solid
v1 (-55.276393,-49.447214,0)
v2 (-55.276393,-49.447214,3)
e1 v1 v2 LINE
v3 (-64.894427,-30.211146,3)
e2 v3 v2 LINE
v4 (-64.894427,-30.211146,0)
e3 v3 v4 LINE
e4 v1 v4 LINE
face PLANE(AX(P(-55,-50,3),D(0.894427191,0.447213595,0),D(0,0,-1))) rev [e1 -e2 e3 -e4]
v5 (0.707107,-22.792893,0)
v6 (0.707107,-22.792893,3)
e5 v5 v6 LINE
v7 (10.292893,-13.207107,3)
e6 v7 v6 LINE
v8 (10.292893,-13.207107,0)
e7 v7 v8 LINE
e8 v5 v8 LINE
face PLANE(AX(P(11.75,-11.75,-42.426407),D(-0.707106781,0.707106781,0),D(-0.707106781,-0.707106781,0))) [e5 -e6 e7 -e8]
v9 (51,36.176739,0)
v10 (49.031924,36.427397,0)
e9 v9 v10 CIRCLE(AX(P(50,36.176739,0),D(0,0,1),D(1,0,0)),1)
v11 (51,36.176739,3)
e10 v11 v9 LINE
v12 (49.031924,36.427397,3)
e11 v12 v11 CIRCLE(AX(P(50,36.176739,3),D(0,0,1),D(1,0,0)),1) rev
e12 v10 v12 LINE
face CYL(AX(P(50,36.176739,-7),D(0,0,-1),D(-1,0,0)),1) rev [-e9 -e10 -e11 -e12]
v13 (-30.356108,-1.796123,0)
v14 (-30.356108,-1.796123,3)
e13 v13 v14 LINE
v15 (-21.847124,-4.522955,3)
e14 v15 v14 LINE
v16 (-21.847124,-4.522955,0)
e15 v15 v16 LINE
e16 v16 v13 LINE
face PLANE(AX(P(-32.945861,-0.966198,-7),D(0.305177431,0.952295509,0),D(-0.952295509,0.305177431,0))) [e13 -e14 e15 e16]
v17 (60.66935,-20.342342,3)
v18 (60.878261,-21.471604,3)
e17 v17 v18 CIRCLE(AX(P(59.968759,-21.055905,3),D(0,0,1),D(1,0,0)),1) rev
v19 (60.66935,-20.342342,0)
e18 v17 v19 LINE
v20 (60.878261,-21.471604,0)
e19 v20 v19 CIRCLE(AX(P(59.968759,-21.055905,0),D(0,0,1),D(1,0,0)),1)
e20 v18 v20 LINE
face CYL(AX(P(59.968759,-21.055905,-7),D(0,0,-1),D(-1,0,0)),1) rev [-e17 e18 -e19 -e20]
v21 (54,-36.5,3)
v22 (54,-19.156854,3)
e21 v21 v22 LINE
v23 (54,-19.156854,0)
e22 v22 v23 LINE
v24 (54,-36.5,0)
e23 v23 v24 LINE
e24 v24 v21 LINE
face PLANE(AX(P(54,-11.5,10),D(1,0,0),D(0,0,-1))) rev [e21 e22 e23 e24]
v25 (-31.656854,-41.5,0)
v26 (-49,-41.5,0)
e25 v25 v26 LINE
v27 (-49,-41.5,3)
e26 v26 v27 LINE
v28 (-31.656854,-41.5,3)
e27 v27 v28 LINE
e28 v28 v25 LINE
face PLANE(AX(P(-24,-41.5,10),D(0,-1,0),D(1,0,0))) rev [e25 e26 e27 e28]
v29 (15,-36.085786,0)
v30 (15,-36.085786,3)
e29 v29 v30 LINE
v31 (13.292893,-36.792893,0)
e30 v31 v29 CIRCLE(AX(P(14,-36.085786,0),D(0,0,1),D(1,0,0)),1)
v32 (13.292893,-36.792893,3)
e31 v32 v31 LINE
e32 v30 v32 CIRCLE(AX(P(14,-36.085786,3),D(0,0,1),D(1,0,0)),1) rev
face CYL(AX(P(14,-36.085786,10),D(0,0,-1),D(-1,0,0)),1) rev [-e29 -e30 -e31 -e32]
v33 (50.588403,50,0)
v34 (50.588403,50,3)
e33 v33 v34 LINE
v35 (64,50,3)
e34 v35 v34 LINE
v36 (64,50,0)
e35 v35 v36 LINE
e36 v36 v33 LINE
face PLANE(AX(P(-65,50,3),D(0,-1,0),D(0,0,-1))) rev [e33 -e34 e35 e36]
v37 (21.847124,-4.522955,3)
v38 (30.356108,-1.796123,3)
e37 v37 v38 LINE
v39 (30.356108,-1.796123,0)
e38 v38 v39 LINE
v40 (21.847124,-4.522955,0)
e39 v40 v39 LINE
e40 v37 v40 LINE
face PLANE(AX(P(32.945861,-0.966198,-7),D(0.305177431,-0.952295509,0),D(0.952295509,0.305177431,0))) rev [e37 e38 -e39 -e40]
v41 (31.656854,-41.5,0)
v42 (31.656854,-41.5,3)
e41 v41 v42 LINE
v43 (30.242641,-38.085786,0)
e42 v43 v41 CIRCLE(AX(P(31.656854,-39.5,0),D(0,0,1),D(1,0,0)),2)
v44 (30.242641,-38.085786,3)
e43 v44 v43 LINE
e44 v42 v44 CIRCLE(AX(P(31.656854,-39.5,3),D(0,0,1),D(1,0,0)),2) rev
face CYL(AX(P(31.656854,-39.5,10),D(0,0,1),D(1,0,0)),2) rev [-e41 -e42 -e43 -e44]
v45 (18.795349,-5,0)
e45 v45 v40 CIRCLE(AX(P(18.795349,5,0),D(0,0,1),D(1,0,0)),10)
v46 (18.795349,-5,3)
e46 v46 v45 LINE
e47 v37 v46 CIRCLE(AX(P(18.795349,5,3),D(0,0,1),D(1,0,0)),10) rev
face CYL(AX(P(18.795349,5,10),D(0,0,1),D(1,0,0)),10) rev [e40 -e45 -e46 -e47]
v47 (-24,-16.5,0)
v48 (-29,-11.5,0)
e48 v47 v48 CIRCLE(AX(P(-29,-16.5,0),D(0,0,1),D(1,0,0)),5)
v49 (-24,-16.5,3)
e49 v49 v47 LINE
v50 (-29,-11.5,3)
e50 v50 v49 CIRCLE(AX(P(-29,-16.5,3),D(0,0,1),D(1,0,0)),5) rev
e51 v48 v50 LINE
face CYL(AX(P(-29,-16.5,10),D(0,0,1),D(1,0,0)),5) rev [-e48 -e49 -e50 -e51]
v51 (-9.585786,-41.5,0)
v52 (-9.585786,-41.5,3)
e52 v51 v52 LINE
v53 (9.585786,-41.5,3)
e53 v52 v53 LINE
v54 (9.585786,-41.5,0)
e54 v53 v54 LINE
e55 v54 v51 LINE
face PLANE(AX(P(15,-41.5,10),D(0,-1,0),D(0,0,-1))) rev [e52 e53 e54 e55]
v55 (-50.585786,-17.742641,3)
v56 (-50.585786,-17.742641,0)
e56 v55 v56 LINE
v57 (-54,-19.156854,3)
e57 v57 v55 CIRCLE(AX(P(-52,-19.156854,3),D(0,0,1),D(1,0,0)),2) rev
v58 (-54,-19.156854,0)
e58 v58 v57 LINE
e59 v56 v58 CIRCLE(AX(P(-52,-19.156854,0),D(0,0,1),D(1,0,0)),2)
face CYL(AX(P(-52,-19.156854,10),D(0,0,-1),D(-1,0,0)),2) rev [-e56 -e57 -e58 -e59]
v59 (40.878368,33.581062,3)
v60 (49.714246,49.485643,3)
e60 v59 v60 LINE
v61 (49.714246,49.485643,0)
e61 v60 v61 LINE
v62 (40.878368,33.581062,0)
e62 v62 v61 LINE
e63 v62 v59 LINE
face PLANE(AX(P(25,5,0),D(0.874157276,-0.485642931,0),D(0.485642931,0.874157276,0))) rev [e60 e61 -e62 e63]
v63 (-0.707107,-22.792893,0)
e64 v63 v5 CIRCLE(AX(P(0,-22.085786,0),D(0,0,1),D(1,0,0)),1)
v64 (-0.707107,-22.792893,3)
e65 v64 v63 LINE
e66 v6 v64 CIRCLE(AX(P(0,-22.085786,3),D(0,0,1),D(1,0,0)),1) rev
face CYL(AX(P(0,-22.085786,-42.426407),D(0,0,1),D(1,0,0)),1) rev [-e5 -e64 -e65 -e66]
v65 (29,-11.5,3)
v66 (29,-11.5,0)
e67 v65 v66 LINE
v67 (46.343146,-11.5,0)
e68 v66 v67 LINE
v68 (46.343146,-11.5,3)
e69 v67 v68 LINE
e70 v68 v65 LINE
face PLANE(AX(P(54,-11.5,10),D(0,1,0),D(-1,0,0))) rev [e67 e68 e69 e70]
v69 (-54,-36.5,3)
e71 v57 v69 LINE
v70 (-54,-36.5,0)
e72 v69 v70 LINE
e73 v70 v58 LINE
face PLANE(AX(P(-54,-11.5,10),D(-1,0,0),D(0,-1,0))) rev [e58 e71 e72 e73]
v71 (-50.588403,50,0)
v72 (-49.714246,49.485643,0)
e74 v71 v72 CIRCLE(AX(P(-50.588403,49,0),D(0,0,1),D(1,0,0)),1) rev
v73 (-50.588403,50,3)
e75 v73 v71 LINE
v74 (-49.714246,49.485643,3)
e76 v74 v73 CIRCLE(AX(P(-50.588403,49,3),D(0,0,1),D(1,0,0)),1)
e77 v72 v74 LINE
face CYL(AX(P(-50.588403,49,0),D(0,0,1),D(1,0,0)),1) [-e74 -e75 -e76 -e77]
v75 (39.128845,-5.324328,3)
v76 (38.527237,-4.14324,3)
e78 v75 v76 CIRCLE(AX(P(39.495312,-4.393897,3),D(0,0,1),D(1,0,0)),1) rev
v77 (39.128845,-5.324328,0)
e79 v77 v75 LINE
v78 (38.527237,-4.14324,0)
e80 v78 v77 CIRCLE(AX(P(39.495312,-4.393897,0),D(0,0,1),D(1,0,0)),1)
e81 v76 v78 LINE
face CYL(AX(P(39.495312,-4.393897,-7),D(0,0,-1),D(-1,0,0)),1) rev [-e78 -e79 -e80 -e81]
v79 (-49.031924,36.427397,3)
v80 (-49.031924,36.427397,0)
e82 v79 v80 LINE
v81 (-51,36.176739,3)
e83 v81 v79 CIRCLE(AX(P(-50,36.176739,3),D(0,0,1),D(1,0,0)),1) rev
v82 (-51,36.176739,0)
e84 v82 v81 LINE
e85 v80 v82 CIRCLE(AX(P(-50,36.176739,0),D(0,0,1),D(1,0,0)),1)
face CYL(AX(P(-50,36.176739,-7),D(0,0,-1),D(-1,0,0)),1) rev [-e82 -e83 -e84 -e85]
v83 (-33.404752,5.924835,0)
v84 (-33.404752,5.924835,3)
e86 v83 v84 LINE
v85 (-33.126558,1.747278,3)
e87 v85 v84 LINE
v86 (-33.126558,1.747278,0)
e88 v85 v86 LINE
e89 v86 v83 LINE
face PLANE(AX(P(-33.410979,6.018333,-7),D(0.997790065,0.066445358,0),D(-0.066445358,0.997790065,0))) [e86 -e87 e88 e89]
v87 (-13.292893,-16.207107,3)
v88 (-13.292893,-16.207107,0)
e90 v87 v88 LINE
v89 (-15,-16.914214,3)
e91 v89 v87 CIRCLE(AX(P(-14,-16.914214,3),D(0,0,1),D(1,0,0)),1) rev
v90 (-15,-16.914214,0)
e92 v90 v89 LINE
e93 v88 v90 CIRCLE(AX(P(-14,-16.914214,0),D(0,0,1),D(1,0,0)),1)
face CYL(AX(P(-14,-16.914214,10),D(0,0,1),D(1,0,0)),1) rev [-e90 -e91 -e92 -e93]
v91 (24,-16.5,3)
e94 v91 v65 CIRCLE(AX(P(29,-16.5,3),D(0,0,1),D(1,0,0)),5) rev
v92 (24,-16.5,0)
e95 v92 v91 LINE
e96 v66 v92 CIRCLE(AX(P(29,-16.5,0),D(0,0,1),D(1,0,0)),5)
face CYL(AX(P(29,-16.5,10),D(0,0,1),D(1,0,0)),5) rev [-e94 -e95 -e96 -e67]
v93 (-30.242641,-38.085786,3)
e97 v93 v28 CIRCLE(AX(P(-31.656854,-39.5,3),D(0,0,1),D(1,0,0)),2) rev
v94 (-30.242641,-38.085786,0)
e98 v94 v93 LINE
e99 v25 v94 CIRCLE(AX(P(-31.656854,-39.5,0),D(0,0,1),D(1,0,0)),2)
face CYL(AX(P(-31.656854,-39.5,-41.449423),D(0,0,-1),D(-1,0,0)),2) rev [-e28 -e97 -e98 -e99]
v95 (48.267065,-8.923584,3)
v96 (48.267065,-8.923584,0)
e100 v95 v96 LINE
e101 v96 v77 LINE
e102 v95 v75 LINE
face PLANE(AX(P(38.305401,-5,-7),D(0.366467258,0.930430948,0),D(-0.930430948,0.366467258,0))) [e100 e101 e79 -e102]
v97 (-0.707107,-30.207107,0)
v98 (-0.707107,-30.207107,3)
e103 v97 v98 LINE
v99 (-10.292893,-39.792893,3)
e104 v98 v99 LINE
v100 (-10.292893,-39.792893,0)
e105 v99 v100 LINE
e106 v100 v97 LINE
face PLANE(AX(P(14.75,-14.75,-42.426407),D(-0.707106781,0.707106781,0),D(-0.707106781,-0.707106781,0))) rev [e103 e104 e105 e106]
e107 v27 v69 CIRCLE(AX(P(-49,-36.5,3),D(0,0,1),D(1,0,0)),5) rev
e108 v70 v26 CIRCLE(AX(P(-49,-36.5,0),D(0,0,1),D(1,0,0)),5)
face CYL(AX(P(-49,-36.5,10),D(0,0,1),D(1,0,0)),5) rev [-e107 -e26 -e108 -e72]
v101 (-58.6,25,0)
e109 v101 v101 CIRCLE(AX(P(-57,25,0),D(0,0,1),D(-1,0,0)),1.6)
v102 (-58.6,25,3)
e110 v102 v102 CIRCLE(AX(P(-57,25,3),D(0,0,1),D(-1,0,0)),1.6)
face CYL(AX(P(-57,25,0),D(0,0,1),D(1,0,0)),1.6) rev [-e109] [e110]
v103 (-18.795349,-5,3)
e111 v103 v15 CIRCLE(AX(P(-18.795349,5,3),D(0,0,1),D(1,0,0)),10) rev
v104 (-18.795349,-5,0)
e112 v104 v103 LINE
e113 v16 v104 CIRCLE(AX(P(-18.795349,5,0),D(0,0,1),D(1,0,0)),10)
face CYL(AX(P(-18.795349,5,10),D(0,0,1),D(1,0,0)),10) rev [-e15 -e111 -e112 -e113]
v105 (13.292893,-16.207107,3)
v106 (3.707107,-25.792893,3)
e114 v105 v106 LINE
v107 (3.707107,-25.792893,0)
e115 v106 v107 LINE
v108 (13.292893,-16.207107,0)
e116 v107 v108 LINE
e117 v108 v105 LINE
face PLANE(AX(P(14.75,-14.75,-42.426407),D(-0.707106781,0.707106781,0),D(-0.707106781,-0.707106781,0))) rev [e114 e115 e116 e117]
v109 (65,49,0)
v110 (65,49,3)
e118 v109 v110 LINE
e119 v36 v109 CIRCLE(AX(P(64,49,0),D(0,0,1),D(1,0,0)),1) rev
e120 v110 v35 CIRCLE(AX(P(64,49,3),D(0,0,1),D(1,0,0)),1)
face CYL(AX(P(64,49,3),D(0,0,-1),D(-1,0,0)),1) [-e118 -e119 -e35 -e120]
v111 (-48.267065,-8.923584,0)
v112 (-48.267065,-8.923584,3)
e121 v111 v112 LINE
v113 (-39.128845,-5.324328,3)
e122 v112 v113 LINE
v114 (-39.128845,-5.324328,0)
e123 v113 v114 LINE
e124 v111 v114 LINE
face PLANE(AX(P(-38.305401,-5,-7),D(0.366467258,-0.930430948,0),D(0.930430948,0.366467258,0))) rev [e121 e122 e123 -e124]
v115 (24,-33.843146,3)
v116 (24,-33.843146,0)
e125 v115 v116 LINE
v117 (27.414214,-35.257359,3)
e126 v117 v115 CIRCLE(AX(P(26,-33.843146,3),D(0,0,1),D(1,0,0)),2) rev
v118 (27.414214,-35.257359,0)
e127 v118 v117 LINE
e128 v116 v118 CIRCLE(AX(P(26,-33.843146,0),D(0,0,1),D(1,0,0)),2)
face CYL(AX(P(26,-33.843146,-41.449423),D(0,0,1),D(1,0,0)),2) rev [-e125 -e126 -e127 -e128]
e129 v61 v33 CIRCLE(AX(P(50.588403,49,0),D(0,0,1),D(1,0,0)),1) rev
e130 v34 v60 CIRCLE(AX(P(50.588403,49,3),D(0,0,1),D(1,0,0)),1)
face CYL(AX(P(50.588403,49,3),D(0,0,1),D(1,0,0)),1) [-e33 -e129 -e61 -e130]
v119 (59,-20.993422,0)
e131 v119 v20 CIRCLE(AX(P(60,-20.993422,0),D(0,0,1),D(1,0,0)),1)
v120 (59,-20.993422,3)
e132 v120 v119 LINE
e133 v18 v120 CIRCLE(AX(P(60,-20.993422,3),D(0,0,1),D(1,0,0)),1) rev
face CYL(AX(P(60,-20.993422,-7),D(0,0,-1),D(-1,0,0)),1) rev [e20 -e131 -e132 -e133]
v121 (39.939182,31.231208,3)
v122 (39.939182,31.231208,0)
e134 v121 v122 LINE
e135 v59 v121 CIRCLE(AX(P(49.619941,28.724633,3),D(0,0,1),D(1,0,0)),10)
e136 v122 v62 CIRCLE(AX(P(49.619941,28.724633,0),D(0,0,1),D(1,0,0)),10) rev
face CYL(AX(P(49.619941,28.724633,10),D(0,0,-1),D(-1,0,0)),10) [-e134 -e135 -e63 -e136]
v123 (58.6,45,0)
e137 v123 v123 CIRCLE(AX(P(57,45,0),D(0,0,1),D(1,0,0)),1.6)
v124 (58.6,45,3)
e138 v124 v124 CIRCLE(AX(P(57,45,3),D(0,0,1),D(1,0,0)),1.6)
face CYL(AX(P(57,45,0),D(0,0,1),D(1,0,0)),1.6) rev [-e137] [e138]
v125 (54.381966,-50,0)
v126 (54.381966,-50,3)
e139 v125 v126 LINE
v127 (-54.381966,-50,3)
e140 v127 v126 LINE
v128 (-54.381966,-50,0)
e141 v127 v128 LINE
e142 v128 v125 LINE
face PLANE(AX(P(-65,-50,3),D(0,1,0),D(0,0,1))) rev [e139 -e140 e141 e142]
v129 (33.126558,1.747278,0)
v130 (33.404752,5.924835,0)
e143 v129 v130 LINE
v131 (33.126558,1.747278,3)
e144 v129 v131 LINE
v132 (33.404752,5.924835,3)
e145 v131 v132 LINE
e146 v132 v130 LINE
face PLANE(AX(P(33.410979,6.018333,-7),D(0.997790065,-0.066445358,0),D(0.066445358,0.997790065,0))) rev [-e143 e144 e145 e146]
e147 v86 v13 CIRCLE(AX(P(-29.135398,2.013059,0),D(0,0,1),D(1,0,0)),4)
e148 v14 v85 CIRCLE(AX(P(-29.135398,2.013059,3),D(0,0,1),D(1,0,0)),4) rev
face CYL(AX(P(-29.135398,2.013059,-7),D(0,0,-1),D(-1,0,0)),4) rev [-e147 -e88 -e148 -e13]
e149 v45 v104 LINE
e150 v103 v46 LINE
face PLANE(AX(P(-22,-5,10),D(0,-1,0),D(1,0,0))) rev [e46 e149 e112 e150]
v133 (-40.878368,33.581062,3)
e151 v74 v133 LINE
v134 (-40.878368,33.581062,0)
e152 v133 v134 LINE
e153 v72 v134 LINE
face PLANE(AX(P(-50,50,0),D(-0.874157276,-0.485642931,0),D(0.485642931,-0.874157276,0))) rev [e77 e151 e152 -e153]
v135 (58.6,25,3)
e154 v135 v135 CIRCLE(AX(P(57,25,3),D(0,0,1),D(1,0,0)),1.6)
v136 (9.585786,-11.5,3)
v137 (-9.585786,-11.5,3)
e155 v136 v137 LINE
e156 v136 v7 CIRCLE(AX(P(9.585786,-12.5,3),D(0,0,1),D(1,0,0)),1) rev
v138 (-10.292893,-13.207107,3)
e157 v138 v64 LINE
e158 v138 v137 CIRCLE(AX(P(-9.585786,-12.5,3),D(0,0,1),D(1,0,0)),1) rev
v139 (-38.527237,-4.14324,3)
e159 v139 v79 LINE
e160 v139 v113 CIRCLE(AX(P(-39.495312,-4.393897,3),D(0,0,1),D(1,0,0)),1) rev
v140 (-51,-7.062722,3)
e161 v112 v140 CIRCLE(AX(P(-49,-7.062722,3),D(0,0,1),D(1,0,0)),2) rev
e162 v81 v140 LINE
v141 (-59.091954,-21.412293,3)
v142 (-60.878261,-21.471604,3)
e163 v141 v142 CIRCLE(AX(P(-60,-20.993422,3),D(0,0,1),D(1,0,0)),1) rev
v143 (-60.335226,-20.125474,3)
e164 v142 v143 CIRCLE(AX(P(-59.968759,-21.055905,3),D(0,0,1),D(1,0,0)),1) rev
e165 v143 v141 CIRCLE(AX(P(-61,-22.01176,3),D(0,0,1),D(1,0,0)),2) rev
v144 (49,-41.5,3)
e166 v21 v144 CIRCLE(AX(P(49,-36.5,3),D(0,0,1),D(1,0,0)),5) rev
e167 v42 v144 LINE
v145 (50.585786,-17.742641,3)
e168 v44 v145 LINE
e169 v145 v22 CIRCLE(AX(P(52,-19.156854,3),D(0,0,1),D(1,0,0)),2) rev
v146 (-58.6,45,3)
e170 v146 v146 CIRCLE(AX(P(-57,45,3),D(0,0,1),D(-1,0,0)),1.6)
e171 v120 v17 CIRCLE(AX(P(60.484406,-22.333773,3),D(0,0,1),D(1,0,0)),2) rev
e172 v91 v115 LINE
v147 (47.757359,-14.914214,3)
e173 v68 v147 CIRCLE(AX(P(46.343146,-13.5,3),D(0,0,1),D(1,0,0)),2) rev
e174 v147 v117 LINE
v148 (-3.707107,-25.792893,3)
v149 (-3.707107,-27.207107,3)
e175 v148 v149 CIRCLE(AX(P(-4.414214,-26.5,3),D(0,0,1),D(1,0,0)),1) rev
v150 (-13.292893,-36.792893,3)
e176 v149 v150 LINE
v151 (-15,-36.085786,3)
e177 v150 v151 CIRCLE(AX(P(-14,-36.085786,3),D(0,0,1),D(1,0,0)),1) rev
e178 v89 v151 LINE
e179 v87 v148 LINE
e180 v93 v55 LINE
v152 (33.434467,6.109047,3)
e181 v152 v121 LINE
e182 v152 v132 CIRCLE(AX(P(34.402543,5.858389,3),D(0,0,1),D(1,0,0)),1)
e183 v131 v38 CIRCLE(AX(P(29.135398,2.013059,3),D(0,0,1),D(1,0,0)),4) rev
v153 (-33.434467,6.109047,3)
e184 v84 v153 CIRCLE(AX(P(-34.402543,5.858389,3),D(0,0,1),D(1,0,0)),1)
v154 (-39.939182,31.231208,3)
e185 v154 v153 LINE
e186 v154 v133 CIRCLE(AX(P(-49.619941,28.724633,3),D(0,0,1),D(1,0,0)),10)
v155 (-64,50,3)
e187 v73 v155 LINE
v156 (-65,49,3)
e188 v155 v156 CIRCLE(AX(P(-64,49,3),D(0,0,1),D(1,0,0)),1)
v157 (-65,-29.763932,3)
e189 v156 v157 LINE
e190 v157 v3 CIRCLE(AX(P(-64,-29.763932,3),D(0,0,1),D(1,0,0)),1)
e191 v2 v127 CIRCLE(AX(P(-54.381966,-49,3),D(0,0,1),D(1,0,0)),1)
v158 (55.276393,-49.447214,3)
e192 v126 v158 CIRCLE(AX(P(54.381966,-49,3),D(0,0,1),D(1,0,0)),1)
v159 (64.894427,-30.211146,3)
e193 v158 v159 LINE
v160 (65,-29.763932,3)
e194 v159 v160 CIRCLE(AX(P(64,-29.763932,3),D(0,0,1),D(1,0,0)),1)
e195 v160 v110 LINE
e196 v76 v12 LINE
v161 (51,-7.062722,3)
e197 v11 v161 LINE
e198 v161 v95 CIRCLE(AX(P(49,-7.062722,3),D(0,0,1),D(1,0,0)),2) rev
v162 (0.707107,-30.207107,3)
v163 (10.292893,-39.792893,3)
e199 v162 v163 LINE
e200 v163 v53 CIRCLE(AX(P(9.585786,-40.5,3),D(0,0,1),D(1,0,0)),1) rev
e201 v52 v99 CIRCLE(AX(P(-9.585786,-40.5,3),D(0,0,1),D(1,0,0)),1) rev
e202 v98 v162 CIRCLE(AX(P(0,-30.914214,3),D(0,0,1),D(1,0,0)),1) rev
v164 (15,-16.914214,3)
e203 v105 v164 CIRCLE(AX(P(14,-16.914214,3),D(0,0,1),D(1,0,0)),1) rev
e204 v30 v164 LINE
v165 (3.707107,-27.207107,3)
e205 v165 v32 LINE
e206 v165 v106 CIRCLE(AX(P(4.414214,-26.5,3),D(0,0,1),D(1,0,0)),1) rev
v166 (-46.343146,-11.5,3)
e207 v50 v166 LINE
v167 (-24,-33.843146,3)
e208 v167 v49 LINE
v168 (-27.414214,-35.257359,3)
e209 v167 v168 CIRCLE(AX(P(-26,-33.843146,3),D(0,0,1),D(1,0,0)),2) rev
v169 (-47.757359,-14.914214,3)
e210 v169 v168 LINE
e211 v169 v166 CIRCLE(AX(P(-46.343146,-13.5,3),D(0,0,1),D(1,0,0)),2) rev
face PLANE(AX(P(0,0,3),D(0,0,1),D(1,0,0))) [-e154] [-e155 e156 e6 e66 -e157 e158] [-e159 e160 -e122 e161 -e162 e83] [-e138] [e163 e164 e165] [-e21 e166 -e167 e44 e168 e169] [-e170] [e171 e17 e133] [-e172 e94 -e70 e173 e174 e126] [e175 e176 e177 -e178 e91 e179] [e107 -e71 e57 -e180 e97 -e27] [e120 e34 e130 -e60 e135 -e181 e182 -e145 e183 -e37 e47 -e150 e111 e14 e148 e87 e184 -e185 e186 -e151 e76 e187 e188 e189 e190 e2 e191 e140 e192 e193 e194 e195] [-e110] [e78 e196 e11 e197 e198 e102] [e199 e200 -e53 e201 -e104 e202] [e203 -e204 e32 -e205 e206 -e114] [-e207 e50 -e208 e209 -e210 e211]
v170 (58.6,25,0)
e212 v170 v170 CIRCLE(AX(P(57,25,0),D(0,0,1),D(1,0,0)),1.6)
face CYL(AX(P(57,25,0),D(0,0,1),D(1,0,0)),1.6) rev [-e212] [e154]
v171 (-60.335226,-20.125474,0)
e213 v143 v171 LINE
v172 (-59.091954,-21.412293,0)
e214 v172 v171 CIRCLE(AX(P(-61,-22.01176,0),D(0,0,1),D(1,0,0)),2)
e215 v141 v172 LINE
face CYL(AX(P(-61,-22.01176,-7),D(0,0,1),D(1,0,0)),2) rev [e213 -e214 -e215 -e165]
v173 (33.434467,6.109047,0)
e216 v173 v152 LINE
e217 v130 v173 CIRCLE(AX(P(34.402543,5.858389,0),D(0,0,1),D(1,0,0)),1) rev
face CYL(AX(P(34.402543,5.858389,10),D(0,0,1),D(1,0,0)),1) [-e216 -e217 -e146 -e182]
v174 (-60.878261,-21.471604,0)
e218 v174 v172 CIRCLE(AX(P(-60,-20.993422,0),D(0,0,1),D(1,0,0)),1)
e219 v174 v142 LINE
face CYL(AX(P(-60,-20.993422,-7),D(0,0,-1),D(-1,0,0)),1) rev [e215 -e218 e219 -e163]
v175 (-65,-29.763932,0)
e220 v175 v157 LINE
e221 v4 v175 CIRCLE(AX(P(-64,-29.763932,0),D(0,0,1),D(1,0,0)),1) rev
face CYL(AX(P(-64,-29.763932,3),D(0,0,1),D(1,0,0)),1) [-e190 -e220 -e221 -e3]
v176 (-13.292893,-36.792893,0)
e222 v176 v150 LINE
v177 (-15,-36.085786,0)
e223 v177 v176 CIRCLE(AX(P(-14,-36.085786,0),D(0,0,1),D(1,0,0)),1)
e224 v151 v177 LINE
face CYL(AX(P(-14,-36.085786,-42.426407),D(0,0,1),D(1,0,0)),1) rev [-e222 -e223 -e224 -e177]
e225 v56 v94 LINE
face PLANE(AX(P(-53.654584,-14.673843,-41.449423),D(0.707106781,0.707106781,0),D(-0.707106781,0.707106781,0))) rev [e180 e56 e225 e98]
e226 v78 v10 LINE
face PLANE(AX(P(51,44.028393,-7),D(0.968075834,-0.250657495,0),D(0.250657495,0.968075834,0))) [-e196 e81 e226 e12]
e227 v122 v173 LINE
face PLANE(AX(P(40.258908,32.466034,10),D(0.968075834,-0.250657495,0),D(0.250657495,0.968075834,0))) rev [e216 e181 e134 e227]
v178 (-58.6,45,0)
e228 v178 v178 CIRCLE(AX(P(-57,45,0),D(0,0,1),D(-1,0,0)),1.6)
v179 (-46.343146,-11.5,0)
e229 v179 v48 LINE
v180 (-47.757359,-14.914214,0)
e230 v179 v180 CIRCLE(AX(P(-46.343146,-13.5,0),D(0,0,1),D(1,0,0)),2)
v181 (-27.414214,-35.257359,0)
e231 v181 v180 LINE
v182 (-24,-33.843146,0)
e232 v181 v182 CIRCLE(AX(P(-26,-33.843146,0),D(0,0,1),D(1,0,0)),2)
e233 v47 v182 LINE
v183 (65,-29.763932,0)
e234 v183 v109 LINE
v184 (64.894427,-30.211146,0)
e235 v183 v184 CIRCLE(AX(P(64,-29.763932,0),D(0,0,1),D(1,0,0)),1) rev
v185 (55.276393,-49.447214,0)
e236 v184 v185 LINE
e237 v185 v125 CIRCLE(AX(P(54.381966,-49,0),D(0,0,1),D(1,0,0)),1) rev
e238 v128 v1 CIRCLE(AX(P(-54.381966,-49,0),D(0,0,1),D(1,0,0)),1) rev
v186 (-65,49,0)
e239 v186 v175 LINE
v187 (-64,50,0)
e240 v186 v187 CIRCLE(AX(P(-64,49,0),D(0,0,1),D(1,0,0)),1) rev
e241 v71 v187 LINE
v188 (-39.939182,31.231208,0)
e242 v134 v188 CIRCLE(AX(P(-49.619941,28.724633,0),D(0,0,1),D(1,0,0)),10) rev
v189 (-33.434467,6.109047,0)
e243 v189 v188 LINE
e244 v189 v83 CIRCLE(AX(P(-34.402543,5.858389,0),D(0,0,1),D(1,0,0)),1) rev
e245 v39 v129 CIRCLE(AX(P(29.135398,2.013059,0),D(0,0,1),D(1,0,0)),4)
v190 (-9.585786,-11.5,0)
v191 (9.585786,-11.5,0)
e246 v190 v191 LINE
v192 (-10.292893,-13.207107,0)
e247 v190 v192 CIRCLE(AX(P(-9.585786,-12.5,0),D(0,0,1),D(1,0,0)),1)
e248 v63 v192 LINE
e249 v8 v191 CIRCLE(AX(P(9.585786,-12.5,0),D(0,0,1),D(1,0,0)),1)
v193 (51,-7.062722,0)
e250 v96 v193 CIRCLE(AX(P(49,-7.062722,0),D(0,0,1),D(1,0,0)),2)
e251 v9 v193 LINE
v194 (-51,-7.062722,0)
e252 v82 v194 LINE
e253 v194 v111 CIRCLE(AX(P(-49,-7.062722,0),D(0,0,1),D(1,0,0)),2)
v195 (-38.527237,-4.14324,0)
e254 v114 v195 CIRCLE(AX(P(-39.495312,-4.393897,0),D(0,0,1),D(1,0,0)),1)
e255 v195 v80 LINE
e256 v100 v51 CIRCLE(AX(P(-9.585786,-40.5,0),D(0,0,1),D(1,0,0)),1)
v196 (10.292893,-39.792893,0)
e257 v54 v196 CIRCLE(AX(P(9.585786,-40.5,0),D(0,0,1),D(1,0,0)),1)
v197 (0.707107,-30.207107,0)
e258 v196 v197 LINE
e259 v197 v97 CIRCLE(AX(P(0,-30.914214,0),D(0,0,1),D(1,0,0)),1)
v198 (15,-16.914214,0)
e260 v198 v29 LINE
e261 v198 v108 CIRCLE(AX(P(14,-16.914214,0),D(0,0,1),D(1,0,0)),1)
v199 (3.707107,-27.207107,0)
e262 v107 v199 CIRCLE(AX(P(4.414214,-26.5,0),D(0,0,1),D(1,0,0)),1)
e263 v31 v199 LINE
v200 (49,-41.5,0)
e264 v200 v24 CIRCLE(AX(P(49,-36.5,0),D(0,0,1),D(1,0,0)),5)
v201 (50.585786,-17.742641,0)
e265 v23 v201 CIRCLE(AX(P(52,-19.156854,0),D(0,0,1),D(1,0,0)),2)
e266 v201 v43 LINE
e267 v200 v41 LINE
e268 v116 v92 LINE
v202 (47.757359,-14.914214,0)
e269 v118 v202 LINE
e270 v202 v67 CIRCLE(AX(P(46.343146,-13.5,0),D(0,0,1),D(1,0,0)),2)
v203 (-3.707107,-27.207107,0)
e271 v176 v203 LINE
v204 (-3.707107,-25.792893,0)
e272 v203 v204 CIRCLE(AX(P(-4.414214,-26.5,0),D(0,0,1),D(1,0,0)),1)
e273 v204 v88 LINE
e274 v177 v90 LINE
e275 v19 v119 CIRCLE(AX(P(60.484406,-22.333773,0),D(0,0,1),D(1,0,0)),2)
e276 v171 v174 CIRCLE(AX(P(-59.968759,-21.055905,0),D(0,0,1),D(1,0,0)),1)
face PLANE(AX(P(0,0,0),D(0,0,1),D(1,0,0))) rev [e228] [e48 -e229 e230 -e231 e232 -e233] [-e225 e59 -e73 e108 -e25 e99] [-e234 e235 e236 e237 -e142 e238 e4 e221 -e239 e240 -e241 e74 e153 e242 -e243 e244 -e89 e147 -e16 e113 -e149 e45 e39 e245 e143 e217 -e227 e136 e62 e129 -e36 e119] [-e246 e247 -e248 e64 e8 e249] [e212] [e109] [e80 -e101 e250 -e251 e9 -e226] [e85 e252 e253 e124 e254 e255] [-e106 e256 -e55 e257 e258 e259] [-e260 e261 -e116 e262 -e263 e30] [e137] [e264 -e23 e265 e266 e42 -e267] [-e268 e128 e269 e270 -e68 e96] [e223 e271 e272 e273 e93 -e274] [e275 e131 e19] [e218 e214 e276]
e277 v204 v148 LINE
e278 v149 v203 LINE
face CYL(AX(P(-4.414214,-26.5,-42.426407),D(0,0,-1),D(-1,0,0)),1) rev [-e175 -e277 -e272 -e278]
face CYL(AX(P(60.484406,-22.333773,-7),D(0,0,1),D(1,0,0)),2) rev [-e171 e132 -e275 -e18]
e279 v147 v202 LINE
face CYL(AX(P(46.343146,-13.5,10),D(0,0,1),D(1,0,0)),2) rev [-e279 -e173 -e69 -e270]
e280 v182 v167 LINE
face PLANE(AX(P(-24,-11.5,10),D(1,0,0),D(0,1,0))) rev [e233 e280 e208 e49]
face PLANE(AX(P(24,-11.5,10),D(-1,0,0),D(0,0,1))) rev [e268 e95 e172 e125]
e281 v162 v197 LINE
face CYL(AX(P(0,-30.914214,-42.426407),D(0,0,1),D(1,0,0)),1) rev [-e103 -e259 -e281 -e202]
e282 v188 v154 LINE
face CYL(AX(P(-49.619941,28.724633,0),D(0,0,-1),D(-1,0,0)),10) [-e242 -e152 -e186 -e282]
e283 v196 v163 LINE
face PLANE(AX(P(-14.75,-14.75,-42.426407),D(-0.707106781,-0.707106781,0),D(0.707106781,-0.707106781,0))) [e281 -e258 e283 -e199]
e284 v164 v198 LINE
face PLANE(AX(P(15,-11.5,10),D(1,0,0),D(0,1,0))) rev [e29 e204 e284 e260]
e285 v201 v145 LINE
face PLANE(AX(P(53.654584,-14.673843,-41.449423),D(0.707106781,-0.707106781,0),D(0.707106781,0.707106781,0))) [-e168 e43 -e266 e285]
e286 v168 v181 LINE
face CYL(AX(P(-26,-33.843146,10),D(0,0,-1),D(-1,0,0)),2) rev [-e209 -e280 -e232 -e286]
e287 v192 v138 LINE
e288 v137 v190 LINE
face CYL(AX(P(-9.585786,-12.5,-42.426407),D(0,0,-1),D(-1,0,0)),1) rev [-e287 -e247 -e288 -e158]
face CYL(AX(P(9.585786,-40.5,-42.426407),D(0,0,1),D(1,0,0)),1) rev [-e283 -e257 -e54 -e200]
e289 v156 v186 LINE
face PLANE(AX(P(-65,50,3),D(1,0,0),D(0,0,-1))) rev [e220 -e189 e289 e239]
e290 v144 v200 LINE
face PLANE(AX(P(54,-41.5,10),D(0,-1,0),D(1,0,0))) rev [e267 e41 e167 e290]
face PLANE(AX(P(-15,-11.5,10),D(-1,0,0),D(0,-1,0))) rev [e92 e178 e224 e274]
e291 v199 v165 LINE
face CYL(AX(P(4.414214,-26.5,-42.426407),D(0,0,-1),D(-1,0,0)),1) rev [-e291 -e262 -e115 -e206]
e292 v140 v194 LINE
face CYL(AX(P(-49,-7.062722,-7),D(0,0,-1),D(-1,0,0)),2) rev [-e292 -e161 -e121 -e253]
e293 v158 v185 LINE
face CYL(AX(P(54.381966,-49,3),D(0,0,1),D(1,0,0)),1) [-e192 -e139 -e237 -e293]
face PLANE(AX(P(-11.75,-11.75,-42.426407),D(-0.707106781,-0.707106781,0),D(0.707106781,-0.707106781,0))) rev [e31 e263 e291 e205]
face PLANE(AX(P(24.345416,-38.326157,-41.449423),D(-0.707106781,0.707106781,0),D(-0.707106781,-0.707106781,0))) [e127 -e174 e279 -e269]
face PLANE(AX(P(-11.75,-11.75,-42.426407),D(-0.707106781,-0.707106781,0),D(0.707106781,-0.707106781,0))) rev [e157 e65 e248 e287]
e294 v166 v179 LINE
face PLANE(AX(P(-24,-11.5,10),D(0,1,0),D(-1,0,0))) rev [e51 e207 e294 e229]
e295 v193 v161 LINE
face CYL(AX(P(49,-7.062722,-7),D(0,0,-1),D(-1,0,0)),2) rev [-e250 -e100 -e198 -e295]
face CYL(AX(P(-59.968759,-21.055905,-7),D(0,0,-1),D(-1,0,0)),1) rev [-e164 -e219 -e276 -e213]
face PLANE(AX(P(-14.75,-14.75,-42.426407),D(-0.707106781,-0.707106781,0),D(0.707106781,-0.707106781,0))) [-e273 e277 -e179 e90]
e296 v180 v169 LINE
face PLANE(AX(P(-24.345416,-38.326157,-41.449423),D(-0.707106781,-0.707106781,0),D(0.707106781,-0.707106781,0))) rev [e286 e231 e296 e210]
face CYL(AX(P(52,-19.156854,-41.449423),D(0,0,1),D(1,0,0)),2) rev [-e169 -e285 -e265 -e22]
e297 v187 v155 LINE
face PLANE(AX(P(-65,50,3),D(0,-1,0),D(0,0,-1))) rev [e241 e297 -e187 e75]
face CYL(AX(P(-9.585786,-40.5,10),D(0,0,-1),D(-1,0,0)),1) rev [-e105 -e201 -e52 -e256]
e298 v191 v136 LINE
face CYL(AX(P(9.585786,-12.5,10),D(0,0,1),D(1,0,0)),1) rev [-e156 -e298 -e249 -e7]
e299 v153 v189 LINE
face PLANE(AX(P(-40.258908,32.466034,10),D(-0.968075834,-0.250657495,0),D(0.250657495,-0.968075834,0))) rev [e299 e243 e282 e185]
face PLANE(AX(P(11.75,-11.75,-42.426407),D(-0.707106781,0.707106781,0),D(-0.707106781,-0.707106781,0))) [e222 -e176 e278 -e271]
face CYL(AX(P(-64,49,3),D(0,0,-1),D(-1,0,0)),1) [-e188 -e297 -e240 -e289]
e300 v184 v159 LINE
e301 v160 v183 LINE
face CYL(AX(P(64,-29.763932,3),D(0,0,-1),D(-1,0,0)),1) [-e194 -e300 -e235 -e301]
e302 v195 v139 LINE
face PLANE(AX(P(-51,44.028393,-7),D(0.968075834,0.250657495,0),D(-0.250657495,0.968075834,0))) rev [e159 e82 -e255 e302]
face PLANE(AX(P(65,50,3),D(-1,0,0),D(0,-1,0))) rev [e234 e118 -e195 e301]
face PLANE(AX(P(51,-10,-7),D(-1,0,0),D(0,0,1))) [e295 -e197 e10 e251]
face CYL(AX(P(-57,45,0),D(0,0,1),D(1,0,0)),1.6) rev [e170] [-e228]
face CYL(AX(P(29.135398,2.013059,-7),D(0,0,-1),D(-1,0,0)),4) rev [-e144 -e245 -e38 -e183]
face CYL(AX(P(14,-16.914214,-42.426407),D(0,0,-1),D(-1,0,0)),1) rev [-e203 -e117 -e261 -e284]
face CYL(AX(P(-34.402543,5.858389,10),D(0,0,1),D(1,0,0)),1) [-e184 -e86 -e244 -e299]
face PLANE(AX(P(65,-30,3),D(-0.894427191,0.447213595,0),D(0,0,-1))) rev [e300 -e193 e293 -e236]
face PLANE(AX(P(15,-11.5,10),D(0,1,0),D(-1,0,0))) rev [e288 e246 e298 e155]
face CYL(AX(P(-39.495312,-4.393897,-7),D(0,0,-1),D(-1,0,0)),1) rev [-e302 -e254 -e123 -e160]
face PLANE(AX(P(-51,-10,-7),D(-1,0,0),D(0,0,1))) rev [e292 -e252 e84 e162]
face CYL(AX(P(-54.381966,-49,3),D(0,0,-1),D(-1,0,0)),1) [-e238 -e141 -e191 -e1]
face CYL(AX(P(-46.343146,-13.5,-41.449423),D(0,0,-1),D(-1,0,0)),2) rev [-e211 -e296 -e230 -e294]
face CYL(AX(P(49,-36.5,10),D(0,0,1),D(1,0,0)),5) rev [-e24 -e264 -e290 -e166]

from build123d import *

# Parameters (mm, degrees)
SKETCH_1_W              = 130
SKETCH_1_H              = 100
EXTRUDE_1_DEPTH         = 3
CHAMFER_1_SIZE          = 10
CHAMFER_1_SIZE2         = 20
CHAMFER_2_SIZE          = 20
CHAMFER_2_SIZE2         = 10
SKETCH_2_R              = 1.6
CUT_EXTRUDE_1_DEPTH     = 83.060952956
CUT_EXTRUDE_2_DEPTH     = 83.060952956
CHAMFER_3_SIZE          = 10
FILLET_2_R              = 5
CUT_EXTRUDE_6_DEPTH     = 10
FILLET_5_R              = 10
SKETCH_11_W             = 30
SKETCH_11_H             = 30
CUT_EXTRUDE_7_DEPTH     = 10
FILLET_6_R              = 5
EXTRUDE_2_DEPTH         = 3
FILLET_7_R              = 1
CUT_EXTRUDE_8_DEPTH     = 10
FILLET_8_R              = 1
FILLET_9_DEPTH          = 3
MIRROR_1_DEPTH          = 3
EXTRUDE_3_DEPTH         = 3
FILLET_10_R             = 2
CUT_EXTRUDE_9_DEPTH     = 10
FILLET_11_R             = 4
FILLET_11_OF_MIRROR_3_R = 4
FILLET_12_R             = 1


with BuildPart() as part:
    # 草图1 → 凸台-拉伸1 (new body)
    with BuildSketch(Plane.XY):
        Rectangle(SKETCH_1_W, SKETCH_1_H)
    extrude(amount=EXTRUDE_1_DEPTH)

    # 倒角1
    chamfer_1_edges = [part.edges().sort_by_distance(p)[0] for p in [
        (65, -50, 1.5),
    ]]
    chamfer_1_side = [part.faces().sort_by_distance(p)[0] for p in [
        (0, -50, 1.5),
    ]]
    chamfer(chamfer_1_edges, length=CHAMFER_1_SIZE, length2=CHAMFER_1_SIZE2, reference=chamfer_1_side[0])

    # 倒角2
    chamfer_2_edges = [part.edges().sort_by_distance(p)[0] for p in [
        (-65, -50, 1.5),
    ]]
    chamfer_2_side = [part.faces().sort_by_distance(p)[0] for p in [
        (-65, 0, 1.5),
    ]]
    chamfer(chamfer_2_edges, length=CHAMFER_2_SIZE, length2=CHAMFER_2_SIZE2, reference=chamfer_2_side[0])

    # 草图2 → 切除-拉伸1 (cut, through all)
    with BuildSketch(Plane.XY.offset(3)):
        with Locations((57, 45)):
            Circle(SKETCH_2_R)
        with Locations((57, 25)):
            Circle(SKETCH_2_R)
        with Locations(Location((-57, 25, 0), (0, 0, 180))):
            Circle(SKETCH_2_R)
        with Locations(Location((-57, 45, 0), (0, 0, 180))):
            Circle(SKETCH_2_R)
    extrude(amount=-CUT_EXTRUDE_1_DEPTH, mode=Mode.SUBTRACT)

    # 草图3 → 切除-拉伸2 (cut, through all)
    with BuildSketch(Plane.XY.offset(3)):
        Polygon((-50, 50), (-25, 5), (25, 5), (50, 50), align=None)
    extrude(amount=-CUT_EXTRUDE_2_DEPTH, mode=Mode.SUBTRACT)

    # 倒角3
    chamfer_3_edges = [part.edges().sort_by_distance(p)[0] for p in [
        (25, 5, 1.5),
        (-25, 5, 1.5),
    ]]
    chamfer(chamfer_3_edges, length=CHAMFER_3_SIZE)

    # 圆角2
    fillet_2_edges = [part.edges().sort_by_distance(p)[0] for p in [
        (29.856429312, 13.741572761, 1.5),
        (-15, 5, 1.5),
        (15, 5, 1.5),
        (-29.856429312, 13.741572761, 1.5),
    ]]
    fillet(fillet_2_edges, radius=FILLET_2_R)

    # 草图9 → 切除-拉伸6 (cut)
    with BuildSketch(Plane(origin=(0, 0, 0), x_dir=(-1, 0, 0), z_dir=(0, 0, -1))):
        Polygon((-8.056483751, -5), (8.056483751, -5), (22, -5), (32.5, 2.5), (40.258907557, 32.466033603), (-40.258907557, 32.466033603), (-32.5, 2.5), (-22, -5), align=None)
    extrude(amount=-CUT_EXTRUDE_6_DEPTH, mode=Mode.SUBTRACT)

    # 圆角5
    fillet_5_edges = [part.edges().sort_by_distance(p)[0] for p in [
        (-40.258907557, 32.466033603, 1.5),
        (22, -5, 1.5),
        (32.5, 2.5, 1.5),
        (40.258907557, 32.466033603, 1.5),
        (-32.5, 2.5, 1.5),
        (-22, -5, 1.5),
    ]]
    fillet(fillet_5_edges, radius=FILLET_5_R)

    # 草图11 → 切除-拉伸7 (cut)
    with BuildSketch(Plane(origin=(0, 0, 0), x_dir=(-1, 0, 0), z_dir=(0, 0, -1))):
        with Locations((0, -26.5)):
            Rectangle(SKETCH_11_W, SKETCH_11_H)
        with Locations((39, -26.5)):
            Rectangle(SKETCH_11_W, SKETCH_11_H)
        with Locations((-39, -26.5)):
            Rectangle(SKETCH_11_W, SKETCH_11_H)
    extrude(amount=-CUT_EXTRUDE_7_DEPTH, mode=Mode.SUBTRACT)

    # 圆角6
    fillet_6_edges = [part.edges().sort_by_distance(p)[0] for p in [
        (24, -11.5, 1.5),
        (24, -41.5, 1.5),
        (54, -41.5, 1.5),
        (54, -11.5, 1.5),
        (-54, -11.5, 1.5),
        (-54, -41.5, 1.5),
        (-24, -41.5, 1.5),
        (-24, -11.5, 1.5),
    ]]
    fillet(fillet_6_edges, radius=FILLET_6_R)

    # 草图12 → 凸台-拉伸2 (add)
    with BuildSketch(Plane.XY.offset(3)):
        Polygon((0, -23.5), (-12, -11.5), (-15, -14.5), (-3, -26.5), align=None)
        Polygon((-15, -14.5), (-12, -11.5), (-15, -11.5), align=None)
        Polygon((3, -26.5), (0, -23.5), (-3, -26.5), (0, -29.5), align=None)
        Polygon((15, -38.5), (3, -26.5), (0, -29.5), (12, -41.5), align=None)
        Polygon((12, -11.5), (0, -23.5), (3, -26.5), (15, -14.5), align=None)
        Polygon((15, -11.5), (12, -11.5), (15, -14.5), align=None)
        Polygon((15, -41.5), (15, -38.5), (12, -41.5), align=None)
        Polygon((0, -29.5), (-3, -26.5), (-15, -38.5), (-12, -41.5), align=None)
        Polygon((-12, -41.5), (-15, -38.5), (-15, -41.5), align=None)
    extrude(amount=-EXTRUDE_2_DEPTH)

    # 圆角7
    fillet_7_edges = [part.edges().sort_by_distance(p)[0] for p in [
        (-3, -26.5, 1.5),
        (-15, -14.5, 1.5),
        (-12, -11.5, 1.5),
        (0, -23.5, 1.5),
        (12, -11.5, 1.5),
        (15, -14.5, 1.5),
        (3, -26.5, 1.5),
        (15, -38.5, 1.5),
        (12, -41.5, 1.5),
        (0, -29.5, 1.5),
        (-12, -41.5, 1.5),
        (-15, -38.5, 1.5),
    ]]
    fillet(fillet_7_edges, radius=FILLET_7_R)

    # 草图13 → 切除-拉伸8 (cut)
    with BuildSketch(Plane.XY.offset(3)):
        Polygon((-51, -10), (-51, 44.02839295), (-38.305401388, -5), align=None)
        Polygon((-61.351808176, -20.525873817), (-59, -19.599571123), (-59, -25.229490169), align=None)
    extrude(amount=-CUT_EXTRUDE_8_DEPTH, mode=Mode.SUBTRACT)

    # 圆角8
    # the kernel refuses this fillet: 1 mm, written as the material it adds along each edge
    with BuildSketch(Plane(origin=(-59, -25.229490169, 3), x_dir=(0, 1, 0), z_dir=(0, 0, -1))) as fillet_8_piece_1:
        with BuildLine():
            CenterArc((FILLET_8_R * 4.2360679775, -FILLET_8_R), FILLET_8_R, 90, 153.434948823)
            Line((FILLET_8_R * 3.788854382, -FILLET_8_R * 1.894427191), (0, 0))
            Line((0, 0), (FILLET_8_R * 4.2360679775, 0))
        make_face()
    extrude(amount=3)
    with BuildSketch(Plane(origin=(-61.351808176, -20.525873817, 3), x_dir=(0.4472135954999554, -0.8944271909999172, 0), z_dir=(0, 0, -1))) as fillet_8_piece_2:
        with BuildLine():
            CenterArc((FILLET_8_R * 1.09259307551, -FILLET_8_R), FILLET_8_R, 90, 95.067143002)
            Line((FILLET_8_R * 0.0965011963042, -FILLET_8_R * 1.08832308978), (0, 0))
            Line((0, 0), (FILLET_8_R * 1.09259307551, 0))
        make_face()
    extrude(amount=3)
    with BuildSketch(Plane(origin=(-38.305401388, -5, 3), x_dir=(-0.25065749455112574, 0.9680758340261121, 0), z_dir=(0, 0, -1))) as fillet_8_piece_3:
        with BuildLine():
            CenterArc((FILLET_8_R * 0.885013342736, -FILLET_8_R), FILLET_8_R, 90, 83.018514551)
            Line((-FILLET_8_R * 0.107572137929, -FILLET_8_R * 0.878451394195), (0, 0))
            Line((0, 0), (FILLET_8_R * 0.885013342736, 0))
        make_face()
    extrude(amount=3)
    with BuildSketch(Plane(origin=(-51, 44.02839295, 3), x_dir=(0.2506574945511292, -0.9680758340261111, 0), z_dir=(0, 0, -1))) as fillet_8_piece_4:
        with BuildLine():
            CenterArc((FILLET_8_R * 7.85165365811, FILLET_8_R), FILLET_8_R, 104.516422726, 165.483577274)
            Line((FILLET_8_R * 7.60099616356, FILLET_8_R * 1.96807583403), (0, 0))
            Line((0, 0), (FILLET_8_R * 7.85165365811, 0))
        make_face()
    extrude(amount=3)

    # 圆角9: read off the stored shape, not the designer's step
    # 圆角9 outline → 圆角9 (add)
    with BuildSketch(Plane.XY):
        with BuildLine():
            ThreePointArc((-60.335225765, -20.125474228), (-59.561658448, -20.622093604), (-59.09195416, -21.412292997))
            ThreePointArc((-59.09195416, -21.412292997), (-59.023259031, -21.207844858), (-59, -20.993422191))
            Line((-59, -20.993422191), (-59, -19.599571123))
            Line((-59, -19.599571123), (-60.335225765, -20.125474228))
        make_face()
        with BuildLine():
            Line((-51, -10), (-48.267065485, -8.923583723))
            ThreePointArc((-48.267065485, -8.923583723), (-50.125640033, -8.715880777), (-51, -7.062721827))
            Line((-51, -7.062721827), (-51, -10))
        make_face()
    extrude(amount=FILLET_9_DEPTH)

    # 镜向1: read off the stored shape, not the designer's step
    # 镜向1 outline → 镜向1 (cut)
    with BuildSketch(Plane.XY):
        with BuildLine():
            Line((39.128845192, -5.324328413), (48.267065485, -8.923583723))
            ThreePointArc((48.267065485, -8.923583723), (50.125640033, -8.715880777), (51, -7.062721827))
            Line((51, -7.062721827), (51, 36.176739291))
            ThreePointArc((51, 36.176739291), (50.126341138, 37.168726145), (49.031924166, 36.427396786))
            Line((49.031924166, 36.427396786), (38.527236615, -4.14323997))
            ThreePointArc((38.527236615, -4.14323997), (38.604249156, -4.847776531), (39.128845192, -5.324328413))
        make_face()
        with BuildLine():
            ThreePointArc((60.87826066, -21.471604387), (60.952073511, -20.8739942), (60.66934984, -20.342342436))
            ThreePointArc((60.66934984, -20.342342436), (59.757682696, -20.470476456), (59, -20.993422191))
            ThreePointArc((59, -20.993422191), (59.753282206, -21.962509561), (60.87826066, -21.471604387))
        make_face()
    extrude(amount=MIRROR_1_DEPTH, mode=Mode.SUBTRACT)

    # 草图14 → 凸台-拉伸3 (add)
    with BuildSketch(Plane.XY.offset(3)):
        with BuildLine():
            Line((53.654583912, -14.673843213), (27.173843213, -41.154583912))
            ThreePointArc((27.173843213, -41.154583912), (25.464466094, -40.035533906), (24.345416088, -38.326156787))
            Line((24.345416088, -38.326156787), (50.826156787, -11.845416088))
            ThreePointArc((50.826156787, -11.845416088), (52.535533906, -12.964466094), (53.654583912, -14.673843213))
        make_face()
    extrude_3 = extrude(amount=-EXTRUDE_3_DEPTH)

    # 镜向2: 凸台-拉伸3 across plane
    add(extrude_3.mirror(Plane(origin=(0, 0, 0), x_dir=(0, 0, 1), z_dir=(1, 0, 0))))

    # 圆角10
    # the kernel refuses this fillet: 2 mm, written as the material it adds along each edge
    with BuildSketch(Plane(origin=(53.654583912, -14.673843213, 3), x_dir=(-0.7071067811865462, -0.7071067811865487, 0), z_dir=(0, 0, -1)), Plane(origin=(24.345416088, -38.326156787, 3), x_dir=(0.707106781186547, 0.7071067811865479, 0), z_dir=(0, 0, -1))) as fillet_10_piece_1:
        with BuildLine():
            CenterArc((4.339935008, -2), FILLET_10_R, 90, 135)
            Line((2.925721445, -3.414213562), (2.784300089, -3.555634919))
            ThreePointArc((2.784300089, -3.555634919), (0.905620433, -1.676955262), (-0.183303028, -0.08))
            Line((-0.183303028, -0.08), (0, 0.2))
            Line((0, 0.2), (4.339935008, 0.2))
            Line((4.339935008, 0.2), (4.339935008, 0))
        make_face()
    extrude(amount=3)
    with BuildSketch(Plane(origin=(27.173843213, -41.154583912, 3), x_dir=(0.9970447988650374, -0.07682232134072318, 0), z_dir=(0, 0, -1)), Plane(origin=(50.826156787, -11.845416088, 3), x_dir=(-0.9970447988650375, 0.07682232134072099, 0), z_dir=(0, 0, -1)), Plane(origin=(-53.654583912, -14.673843213, 3), x_dir=(-0.07682232134072965, -0.9970447988650367, 0), z_dir=(0, 0, -1)), Plane(origin=(-24.345416088, -38.326156787, 3), x_dir=(0.07682232134072216, 0.9970447988650374, 0), z_dir=(0, 0, -1))) as fillet_10_piece_2:
        with BuildLine():
            CenterArc((4.34265386, -1.994089598), FILLET_10_R, 85.594064217, 135)
            Line((2.823976414, -3.295480706), (2.67210867, -3.425619817))
            Line((2.67210867, -3.425619817), (-0.151867745, -0.130139111))
            Line((-0.151867745, -0.130139111), (-0.058527367, 0.191244731))
            ThreePointArc((-0.058527367, 0.191244731), (1.862660256, 0.403514671), (4.511662967, 0.19940896))
            Line((4.511662967, 0.19940896), (4.496298503, 0))
        make_face()
    extrude(amount=3)
    with BuildSketch(Plane(origin=(-27.173843213, -41.154583912, 3), x_dir=(-0.9970447988650369, -0.07682232134072821, 0), z_dir=(0, 0, -1)), Plane(origin=(-50.826156787, -11.845416088, 3), x_dir=(0.9970447988650375, 0.07682232134071967, 0), z_dir=(0, 0, -1))) as fillet_10_piece_3:
        with BuildLine():
            CenterArc((4.34265386, 1.994089598), FILLET_10_R, 139.405935783, 135)
            Line((2.823976414, 3.295480706), (2.67210867, 3.425619817))
            Line((2.67210867, 3.425619817), (-0.151867745, 0.130139111))
            Line((-0.151867745, 0.130139111), (-0.058527367, -0.191244731))
            ThreePointArc((-0.058527367, -0.191244731), (1.862660256, -0.403514671), (4.511662967, -0.19940896))
            Line((4.511662967, -0.19940896), (4.496298503, 0))
        make_face()
    extrude(amount=3)

    # 草图15 → 切除-拉伸9 (cut)
    with BuildSketch(Plane.XY.offset(3)):
        Polygon((33.410978737, 6.018332862), (32.945861228, -0.966197595), (21.847123776, -4.522955085), align=None)
    cut_extrude_9 = extrude(amount=-CUT_EXTRUDE_9_DEPTH, mode=Mode.SUBTRACT)

    # 圆角11
    fillet_11_edges = [part.edges().sort_by_distance(p)[0] for p in [
        (32.945861228, -0.966197595, 1.5),
    ]]
    fillet(fillet_11_edges, radius=FILLET_11_R)

    # 镜向3: 切除-拉伸9 across plane
    add(cut_extrude_9.mirror(Plane(origin=(0, 0, 0), x_dir=(0, 0, 1), z_dir=(1, 0, 0))), mode=Mode.SUBTRACT)

    # 圆角11 of 镜向3
    fillet_11_of_mirror_3_edges = [part.edges().sort_by_distance(p)[0] for p in [
        (-32.945861228, -0.966197595, 1.5),
    ]]
    fillet(fillet_11_of_mirror_3_edges, radius=FILLET_11_OF_MIRROR_3_R)

    # 圆角12
    fillet_12_edges = [part.edges().sort_by_distance(p)[0] for p in [
        (65, -30, 1.5),
        (-33.410978737, 6.018332862, 1.5),
        (33.410978737, 6.018332862, 1.5),
        (55, -50, 1.5),
        (-55, -50, 1.5),
        (-65, -30, 1.5),
        (-50, 50, 1.5),
        (50, 50, 1.5),
        (-65, 50, 1.5),
        (65, 50, 1.5),
    ]]
    fillet(fillet_12_edges, radius=FILLET_12_R)


solid = part.part
